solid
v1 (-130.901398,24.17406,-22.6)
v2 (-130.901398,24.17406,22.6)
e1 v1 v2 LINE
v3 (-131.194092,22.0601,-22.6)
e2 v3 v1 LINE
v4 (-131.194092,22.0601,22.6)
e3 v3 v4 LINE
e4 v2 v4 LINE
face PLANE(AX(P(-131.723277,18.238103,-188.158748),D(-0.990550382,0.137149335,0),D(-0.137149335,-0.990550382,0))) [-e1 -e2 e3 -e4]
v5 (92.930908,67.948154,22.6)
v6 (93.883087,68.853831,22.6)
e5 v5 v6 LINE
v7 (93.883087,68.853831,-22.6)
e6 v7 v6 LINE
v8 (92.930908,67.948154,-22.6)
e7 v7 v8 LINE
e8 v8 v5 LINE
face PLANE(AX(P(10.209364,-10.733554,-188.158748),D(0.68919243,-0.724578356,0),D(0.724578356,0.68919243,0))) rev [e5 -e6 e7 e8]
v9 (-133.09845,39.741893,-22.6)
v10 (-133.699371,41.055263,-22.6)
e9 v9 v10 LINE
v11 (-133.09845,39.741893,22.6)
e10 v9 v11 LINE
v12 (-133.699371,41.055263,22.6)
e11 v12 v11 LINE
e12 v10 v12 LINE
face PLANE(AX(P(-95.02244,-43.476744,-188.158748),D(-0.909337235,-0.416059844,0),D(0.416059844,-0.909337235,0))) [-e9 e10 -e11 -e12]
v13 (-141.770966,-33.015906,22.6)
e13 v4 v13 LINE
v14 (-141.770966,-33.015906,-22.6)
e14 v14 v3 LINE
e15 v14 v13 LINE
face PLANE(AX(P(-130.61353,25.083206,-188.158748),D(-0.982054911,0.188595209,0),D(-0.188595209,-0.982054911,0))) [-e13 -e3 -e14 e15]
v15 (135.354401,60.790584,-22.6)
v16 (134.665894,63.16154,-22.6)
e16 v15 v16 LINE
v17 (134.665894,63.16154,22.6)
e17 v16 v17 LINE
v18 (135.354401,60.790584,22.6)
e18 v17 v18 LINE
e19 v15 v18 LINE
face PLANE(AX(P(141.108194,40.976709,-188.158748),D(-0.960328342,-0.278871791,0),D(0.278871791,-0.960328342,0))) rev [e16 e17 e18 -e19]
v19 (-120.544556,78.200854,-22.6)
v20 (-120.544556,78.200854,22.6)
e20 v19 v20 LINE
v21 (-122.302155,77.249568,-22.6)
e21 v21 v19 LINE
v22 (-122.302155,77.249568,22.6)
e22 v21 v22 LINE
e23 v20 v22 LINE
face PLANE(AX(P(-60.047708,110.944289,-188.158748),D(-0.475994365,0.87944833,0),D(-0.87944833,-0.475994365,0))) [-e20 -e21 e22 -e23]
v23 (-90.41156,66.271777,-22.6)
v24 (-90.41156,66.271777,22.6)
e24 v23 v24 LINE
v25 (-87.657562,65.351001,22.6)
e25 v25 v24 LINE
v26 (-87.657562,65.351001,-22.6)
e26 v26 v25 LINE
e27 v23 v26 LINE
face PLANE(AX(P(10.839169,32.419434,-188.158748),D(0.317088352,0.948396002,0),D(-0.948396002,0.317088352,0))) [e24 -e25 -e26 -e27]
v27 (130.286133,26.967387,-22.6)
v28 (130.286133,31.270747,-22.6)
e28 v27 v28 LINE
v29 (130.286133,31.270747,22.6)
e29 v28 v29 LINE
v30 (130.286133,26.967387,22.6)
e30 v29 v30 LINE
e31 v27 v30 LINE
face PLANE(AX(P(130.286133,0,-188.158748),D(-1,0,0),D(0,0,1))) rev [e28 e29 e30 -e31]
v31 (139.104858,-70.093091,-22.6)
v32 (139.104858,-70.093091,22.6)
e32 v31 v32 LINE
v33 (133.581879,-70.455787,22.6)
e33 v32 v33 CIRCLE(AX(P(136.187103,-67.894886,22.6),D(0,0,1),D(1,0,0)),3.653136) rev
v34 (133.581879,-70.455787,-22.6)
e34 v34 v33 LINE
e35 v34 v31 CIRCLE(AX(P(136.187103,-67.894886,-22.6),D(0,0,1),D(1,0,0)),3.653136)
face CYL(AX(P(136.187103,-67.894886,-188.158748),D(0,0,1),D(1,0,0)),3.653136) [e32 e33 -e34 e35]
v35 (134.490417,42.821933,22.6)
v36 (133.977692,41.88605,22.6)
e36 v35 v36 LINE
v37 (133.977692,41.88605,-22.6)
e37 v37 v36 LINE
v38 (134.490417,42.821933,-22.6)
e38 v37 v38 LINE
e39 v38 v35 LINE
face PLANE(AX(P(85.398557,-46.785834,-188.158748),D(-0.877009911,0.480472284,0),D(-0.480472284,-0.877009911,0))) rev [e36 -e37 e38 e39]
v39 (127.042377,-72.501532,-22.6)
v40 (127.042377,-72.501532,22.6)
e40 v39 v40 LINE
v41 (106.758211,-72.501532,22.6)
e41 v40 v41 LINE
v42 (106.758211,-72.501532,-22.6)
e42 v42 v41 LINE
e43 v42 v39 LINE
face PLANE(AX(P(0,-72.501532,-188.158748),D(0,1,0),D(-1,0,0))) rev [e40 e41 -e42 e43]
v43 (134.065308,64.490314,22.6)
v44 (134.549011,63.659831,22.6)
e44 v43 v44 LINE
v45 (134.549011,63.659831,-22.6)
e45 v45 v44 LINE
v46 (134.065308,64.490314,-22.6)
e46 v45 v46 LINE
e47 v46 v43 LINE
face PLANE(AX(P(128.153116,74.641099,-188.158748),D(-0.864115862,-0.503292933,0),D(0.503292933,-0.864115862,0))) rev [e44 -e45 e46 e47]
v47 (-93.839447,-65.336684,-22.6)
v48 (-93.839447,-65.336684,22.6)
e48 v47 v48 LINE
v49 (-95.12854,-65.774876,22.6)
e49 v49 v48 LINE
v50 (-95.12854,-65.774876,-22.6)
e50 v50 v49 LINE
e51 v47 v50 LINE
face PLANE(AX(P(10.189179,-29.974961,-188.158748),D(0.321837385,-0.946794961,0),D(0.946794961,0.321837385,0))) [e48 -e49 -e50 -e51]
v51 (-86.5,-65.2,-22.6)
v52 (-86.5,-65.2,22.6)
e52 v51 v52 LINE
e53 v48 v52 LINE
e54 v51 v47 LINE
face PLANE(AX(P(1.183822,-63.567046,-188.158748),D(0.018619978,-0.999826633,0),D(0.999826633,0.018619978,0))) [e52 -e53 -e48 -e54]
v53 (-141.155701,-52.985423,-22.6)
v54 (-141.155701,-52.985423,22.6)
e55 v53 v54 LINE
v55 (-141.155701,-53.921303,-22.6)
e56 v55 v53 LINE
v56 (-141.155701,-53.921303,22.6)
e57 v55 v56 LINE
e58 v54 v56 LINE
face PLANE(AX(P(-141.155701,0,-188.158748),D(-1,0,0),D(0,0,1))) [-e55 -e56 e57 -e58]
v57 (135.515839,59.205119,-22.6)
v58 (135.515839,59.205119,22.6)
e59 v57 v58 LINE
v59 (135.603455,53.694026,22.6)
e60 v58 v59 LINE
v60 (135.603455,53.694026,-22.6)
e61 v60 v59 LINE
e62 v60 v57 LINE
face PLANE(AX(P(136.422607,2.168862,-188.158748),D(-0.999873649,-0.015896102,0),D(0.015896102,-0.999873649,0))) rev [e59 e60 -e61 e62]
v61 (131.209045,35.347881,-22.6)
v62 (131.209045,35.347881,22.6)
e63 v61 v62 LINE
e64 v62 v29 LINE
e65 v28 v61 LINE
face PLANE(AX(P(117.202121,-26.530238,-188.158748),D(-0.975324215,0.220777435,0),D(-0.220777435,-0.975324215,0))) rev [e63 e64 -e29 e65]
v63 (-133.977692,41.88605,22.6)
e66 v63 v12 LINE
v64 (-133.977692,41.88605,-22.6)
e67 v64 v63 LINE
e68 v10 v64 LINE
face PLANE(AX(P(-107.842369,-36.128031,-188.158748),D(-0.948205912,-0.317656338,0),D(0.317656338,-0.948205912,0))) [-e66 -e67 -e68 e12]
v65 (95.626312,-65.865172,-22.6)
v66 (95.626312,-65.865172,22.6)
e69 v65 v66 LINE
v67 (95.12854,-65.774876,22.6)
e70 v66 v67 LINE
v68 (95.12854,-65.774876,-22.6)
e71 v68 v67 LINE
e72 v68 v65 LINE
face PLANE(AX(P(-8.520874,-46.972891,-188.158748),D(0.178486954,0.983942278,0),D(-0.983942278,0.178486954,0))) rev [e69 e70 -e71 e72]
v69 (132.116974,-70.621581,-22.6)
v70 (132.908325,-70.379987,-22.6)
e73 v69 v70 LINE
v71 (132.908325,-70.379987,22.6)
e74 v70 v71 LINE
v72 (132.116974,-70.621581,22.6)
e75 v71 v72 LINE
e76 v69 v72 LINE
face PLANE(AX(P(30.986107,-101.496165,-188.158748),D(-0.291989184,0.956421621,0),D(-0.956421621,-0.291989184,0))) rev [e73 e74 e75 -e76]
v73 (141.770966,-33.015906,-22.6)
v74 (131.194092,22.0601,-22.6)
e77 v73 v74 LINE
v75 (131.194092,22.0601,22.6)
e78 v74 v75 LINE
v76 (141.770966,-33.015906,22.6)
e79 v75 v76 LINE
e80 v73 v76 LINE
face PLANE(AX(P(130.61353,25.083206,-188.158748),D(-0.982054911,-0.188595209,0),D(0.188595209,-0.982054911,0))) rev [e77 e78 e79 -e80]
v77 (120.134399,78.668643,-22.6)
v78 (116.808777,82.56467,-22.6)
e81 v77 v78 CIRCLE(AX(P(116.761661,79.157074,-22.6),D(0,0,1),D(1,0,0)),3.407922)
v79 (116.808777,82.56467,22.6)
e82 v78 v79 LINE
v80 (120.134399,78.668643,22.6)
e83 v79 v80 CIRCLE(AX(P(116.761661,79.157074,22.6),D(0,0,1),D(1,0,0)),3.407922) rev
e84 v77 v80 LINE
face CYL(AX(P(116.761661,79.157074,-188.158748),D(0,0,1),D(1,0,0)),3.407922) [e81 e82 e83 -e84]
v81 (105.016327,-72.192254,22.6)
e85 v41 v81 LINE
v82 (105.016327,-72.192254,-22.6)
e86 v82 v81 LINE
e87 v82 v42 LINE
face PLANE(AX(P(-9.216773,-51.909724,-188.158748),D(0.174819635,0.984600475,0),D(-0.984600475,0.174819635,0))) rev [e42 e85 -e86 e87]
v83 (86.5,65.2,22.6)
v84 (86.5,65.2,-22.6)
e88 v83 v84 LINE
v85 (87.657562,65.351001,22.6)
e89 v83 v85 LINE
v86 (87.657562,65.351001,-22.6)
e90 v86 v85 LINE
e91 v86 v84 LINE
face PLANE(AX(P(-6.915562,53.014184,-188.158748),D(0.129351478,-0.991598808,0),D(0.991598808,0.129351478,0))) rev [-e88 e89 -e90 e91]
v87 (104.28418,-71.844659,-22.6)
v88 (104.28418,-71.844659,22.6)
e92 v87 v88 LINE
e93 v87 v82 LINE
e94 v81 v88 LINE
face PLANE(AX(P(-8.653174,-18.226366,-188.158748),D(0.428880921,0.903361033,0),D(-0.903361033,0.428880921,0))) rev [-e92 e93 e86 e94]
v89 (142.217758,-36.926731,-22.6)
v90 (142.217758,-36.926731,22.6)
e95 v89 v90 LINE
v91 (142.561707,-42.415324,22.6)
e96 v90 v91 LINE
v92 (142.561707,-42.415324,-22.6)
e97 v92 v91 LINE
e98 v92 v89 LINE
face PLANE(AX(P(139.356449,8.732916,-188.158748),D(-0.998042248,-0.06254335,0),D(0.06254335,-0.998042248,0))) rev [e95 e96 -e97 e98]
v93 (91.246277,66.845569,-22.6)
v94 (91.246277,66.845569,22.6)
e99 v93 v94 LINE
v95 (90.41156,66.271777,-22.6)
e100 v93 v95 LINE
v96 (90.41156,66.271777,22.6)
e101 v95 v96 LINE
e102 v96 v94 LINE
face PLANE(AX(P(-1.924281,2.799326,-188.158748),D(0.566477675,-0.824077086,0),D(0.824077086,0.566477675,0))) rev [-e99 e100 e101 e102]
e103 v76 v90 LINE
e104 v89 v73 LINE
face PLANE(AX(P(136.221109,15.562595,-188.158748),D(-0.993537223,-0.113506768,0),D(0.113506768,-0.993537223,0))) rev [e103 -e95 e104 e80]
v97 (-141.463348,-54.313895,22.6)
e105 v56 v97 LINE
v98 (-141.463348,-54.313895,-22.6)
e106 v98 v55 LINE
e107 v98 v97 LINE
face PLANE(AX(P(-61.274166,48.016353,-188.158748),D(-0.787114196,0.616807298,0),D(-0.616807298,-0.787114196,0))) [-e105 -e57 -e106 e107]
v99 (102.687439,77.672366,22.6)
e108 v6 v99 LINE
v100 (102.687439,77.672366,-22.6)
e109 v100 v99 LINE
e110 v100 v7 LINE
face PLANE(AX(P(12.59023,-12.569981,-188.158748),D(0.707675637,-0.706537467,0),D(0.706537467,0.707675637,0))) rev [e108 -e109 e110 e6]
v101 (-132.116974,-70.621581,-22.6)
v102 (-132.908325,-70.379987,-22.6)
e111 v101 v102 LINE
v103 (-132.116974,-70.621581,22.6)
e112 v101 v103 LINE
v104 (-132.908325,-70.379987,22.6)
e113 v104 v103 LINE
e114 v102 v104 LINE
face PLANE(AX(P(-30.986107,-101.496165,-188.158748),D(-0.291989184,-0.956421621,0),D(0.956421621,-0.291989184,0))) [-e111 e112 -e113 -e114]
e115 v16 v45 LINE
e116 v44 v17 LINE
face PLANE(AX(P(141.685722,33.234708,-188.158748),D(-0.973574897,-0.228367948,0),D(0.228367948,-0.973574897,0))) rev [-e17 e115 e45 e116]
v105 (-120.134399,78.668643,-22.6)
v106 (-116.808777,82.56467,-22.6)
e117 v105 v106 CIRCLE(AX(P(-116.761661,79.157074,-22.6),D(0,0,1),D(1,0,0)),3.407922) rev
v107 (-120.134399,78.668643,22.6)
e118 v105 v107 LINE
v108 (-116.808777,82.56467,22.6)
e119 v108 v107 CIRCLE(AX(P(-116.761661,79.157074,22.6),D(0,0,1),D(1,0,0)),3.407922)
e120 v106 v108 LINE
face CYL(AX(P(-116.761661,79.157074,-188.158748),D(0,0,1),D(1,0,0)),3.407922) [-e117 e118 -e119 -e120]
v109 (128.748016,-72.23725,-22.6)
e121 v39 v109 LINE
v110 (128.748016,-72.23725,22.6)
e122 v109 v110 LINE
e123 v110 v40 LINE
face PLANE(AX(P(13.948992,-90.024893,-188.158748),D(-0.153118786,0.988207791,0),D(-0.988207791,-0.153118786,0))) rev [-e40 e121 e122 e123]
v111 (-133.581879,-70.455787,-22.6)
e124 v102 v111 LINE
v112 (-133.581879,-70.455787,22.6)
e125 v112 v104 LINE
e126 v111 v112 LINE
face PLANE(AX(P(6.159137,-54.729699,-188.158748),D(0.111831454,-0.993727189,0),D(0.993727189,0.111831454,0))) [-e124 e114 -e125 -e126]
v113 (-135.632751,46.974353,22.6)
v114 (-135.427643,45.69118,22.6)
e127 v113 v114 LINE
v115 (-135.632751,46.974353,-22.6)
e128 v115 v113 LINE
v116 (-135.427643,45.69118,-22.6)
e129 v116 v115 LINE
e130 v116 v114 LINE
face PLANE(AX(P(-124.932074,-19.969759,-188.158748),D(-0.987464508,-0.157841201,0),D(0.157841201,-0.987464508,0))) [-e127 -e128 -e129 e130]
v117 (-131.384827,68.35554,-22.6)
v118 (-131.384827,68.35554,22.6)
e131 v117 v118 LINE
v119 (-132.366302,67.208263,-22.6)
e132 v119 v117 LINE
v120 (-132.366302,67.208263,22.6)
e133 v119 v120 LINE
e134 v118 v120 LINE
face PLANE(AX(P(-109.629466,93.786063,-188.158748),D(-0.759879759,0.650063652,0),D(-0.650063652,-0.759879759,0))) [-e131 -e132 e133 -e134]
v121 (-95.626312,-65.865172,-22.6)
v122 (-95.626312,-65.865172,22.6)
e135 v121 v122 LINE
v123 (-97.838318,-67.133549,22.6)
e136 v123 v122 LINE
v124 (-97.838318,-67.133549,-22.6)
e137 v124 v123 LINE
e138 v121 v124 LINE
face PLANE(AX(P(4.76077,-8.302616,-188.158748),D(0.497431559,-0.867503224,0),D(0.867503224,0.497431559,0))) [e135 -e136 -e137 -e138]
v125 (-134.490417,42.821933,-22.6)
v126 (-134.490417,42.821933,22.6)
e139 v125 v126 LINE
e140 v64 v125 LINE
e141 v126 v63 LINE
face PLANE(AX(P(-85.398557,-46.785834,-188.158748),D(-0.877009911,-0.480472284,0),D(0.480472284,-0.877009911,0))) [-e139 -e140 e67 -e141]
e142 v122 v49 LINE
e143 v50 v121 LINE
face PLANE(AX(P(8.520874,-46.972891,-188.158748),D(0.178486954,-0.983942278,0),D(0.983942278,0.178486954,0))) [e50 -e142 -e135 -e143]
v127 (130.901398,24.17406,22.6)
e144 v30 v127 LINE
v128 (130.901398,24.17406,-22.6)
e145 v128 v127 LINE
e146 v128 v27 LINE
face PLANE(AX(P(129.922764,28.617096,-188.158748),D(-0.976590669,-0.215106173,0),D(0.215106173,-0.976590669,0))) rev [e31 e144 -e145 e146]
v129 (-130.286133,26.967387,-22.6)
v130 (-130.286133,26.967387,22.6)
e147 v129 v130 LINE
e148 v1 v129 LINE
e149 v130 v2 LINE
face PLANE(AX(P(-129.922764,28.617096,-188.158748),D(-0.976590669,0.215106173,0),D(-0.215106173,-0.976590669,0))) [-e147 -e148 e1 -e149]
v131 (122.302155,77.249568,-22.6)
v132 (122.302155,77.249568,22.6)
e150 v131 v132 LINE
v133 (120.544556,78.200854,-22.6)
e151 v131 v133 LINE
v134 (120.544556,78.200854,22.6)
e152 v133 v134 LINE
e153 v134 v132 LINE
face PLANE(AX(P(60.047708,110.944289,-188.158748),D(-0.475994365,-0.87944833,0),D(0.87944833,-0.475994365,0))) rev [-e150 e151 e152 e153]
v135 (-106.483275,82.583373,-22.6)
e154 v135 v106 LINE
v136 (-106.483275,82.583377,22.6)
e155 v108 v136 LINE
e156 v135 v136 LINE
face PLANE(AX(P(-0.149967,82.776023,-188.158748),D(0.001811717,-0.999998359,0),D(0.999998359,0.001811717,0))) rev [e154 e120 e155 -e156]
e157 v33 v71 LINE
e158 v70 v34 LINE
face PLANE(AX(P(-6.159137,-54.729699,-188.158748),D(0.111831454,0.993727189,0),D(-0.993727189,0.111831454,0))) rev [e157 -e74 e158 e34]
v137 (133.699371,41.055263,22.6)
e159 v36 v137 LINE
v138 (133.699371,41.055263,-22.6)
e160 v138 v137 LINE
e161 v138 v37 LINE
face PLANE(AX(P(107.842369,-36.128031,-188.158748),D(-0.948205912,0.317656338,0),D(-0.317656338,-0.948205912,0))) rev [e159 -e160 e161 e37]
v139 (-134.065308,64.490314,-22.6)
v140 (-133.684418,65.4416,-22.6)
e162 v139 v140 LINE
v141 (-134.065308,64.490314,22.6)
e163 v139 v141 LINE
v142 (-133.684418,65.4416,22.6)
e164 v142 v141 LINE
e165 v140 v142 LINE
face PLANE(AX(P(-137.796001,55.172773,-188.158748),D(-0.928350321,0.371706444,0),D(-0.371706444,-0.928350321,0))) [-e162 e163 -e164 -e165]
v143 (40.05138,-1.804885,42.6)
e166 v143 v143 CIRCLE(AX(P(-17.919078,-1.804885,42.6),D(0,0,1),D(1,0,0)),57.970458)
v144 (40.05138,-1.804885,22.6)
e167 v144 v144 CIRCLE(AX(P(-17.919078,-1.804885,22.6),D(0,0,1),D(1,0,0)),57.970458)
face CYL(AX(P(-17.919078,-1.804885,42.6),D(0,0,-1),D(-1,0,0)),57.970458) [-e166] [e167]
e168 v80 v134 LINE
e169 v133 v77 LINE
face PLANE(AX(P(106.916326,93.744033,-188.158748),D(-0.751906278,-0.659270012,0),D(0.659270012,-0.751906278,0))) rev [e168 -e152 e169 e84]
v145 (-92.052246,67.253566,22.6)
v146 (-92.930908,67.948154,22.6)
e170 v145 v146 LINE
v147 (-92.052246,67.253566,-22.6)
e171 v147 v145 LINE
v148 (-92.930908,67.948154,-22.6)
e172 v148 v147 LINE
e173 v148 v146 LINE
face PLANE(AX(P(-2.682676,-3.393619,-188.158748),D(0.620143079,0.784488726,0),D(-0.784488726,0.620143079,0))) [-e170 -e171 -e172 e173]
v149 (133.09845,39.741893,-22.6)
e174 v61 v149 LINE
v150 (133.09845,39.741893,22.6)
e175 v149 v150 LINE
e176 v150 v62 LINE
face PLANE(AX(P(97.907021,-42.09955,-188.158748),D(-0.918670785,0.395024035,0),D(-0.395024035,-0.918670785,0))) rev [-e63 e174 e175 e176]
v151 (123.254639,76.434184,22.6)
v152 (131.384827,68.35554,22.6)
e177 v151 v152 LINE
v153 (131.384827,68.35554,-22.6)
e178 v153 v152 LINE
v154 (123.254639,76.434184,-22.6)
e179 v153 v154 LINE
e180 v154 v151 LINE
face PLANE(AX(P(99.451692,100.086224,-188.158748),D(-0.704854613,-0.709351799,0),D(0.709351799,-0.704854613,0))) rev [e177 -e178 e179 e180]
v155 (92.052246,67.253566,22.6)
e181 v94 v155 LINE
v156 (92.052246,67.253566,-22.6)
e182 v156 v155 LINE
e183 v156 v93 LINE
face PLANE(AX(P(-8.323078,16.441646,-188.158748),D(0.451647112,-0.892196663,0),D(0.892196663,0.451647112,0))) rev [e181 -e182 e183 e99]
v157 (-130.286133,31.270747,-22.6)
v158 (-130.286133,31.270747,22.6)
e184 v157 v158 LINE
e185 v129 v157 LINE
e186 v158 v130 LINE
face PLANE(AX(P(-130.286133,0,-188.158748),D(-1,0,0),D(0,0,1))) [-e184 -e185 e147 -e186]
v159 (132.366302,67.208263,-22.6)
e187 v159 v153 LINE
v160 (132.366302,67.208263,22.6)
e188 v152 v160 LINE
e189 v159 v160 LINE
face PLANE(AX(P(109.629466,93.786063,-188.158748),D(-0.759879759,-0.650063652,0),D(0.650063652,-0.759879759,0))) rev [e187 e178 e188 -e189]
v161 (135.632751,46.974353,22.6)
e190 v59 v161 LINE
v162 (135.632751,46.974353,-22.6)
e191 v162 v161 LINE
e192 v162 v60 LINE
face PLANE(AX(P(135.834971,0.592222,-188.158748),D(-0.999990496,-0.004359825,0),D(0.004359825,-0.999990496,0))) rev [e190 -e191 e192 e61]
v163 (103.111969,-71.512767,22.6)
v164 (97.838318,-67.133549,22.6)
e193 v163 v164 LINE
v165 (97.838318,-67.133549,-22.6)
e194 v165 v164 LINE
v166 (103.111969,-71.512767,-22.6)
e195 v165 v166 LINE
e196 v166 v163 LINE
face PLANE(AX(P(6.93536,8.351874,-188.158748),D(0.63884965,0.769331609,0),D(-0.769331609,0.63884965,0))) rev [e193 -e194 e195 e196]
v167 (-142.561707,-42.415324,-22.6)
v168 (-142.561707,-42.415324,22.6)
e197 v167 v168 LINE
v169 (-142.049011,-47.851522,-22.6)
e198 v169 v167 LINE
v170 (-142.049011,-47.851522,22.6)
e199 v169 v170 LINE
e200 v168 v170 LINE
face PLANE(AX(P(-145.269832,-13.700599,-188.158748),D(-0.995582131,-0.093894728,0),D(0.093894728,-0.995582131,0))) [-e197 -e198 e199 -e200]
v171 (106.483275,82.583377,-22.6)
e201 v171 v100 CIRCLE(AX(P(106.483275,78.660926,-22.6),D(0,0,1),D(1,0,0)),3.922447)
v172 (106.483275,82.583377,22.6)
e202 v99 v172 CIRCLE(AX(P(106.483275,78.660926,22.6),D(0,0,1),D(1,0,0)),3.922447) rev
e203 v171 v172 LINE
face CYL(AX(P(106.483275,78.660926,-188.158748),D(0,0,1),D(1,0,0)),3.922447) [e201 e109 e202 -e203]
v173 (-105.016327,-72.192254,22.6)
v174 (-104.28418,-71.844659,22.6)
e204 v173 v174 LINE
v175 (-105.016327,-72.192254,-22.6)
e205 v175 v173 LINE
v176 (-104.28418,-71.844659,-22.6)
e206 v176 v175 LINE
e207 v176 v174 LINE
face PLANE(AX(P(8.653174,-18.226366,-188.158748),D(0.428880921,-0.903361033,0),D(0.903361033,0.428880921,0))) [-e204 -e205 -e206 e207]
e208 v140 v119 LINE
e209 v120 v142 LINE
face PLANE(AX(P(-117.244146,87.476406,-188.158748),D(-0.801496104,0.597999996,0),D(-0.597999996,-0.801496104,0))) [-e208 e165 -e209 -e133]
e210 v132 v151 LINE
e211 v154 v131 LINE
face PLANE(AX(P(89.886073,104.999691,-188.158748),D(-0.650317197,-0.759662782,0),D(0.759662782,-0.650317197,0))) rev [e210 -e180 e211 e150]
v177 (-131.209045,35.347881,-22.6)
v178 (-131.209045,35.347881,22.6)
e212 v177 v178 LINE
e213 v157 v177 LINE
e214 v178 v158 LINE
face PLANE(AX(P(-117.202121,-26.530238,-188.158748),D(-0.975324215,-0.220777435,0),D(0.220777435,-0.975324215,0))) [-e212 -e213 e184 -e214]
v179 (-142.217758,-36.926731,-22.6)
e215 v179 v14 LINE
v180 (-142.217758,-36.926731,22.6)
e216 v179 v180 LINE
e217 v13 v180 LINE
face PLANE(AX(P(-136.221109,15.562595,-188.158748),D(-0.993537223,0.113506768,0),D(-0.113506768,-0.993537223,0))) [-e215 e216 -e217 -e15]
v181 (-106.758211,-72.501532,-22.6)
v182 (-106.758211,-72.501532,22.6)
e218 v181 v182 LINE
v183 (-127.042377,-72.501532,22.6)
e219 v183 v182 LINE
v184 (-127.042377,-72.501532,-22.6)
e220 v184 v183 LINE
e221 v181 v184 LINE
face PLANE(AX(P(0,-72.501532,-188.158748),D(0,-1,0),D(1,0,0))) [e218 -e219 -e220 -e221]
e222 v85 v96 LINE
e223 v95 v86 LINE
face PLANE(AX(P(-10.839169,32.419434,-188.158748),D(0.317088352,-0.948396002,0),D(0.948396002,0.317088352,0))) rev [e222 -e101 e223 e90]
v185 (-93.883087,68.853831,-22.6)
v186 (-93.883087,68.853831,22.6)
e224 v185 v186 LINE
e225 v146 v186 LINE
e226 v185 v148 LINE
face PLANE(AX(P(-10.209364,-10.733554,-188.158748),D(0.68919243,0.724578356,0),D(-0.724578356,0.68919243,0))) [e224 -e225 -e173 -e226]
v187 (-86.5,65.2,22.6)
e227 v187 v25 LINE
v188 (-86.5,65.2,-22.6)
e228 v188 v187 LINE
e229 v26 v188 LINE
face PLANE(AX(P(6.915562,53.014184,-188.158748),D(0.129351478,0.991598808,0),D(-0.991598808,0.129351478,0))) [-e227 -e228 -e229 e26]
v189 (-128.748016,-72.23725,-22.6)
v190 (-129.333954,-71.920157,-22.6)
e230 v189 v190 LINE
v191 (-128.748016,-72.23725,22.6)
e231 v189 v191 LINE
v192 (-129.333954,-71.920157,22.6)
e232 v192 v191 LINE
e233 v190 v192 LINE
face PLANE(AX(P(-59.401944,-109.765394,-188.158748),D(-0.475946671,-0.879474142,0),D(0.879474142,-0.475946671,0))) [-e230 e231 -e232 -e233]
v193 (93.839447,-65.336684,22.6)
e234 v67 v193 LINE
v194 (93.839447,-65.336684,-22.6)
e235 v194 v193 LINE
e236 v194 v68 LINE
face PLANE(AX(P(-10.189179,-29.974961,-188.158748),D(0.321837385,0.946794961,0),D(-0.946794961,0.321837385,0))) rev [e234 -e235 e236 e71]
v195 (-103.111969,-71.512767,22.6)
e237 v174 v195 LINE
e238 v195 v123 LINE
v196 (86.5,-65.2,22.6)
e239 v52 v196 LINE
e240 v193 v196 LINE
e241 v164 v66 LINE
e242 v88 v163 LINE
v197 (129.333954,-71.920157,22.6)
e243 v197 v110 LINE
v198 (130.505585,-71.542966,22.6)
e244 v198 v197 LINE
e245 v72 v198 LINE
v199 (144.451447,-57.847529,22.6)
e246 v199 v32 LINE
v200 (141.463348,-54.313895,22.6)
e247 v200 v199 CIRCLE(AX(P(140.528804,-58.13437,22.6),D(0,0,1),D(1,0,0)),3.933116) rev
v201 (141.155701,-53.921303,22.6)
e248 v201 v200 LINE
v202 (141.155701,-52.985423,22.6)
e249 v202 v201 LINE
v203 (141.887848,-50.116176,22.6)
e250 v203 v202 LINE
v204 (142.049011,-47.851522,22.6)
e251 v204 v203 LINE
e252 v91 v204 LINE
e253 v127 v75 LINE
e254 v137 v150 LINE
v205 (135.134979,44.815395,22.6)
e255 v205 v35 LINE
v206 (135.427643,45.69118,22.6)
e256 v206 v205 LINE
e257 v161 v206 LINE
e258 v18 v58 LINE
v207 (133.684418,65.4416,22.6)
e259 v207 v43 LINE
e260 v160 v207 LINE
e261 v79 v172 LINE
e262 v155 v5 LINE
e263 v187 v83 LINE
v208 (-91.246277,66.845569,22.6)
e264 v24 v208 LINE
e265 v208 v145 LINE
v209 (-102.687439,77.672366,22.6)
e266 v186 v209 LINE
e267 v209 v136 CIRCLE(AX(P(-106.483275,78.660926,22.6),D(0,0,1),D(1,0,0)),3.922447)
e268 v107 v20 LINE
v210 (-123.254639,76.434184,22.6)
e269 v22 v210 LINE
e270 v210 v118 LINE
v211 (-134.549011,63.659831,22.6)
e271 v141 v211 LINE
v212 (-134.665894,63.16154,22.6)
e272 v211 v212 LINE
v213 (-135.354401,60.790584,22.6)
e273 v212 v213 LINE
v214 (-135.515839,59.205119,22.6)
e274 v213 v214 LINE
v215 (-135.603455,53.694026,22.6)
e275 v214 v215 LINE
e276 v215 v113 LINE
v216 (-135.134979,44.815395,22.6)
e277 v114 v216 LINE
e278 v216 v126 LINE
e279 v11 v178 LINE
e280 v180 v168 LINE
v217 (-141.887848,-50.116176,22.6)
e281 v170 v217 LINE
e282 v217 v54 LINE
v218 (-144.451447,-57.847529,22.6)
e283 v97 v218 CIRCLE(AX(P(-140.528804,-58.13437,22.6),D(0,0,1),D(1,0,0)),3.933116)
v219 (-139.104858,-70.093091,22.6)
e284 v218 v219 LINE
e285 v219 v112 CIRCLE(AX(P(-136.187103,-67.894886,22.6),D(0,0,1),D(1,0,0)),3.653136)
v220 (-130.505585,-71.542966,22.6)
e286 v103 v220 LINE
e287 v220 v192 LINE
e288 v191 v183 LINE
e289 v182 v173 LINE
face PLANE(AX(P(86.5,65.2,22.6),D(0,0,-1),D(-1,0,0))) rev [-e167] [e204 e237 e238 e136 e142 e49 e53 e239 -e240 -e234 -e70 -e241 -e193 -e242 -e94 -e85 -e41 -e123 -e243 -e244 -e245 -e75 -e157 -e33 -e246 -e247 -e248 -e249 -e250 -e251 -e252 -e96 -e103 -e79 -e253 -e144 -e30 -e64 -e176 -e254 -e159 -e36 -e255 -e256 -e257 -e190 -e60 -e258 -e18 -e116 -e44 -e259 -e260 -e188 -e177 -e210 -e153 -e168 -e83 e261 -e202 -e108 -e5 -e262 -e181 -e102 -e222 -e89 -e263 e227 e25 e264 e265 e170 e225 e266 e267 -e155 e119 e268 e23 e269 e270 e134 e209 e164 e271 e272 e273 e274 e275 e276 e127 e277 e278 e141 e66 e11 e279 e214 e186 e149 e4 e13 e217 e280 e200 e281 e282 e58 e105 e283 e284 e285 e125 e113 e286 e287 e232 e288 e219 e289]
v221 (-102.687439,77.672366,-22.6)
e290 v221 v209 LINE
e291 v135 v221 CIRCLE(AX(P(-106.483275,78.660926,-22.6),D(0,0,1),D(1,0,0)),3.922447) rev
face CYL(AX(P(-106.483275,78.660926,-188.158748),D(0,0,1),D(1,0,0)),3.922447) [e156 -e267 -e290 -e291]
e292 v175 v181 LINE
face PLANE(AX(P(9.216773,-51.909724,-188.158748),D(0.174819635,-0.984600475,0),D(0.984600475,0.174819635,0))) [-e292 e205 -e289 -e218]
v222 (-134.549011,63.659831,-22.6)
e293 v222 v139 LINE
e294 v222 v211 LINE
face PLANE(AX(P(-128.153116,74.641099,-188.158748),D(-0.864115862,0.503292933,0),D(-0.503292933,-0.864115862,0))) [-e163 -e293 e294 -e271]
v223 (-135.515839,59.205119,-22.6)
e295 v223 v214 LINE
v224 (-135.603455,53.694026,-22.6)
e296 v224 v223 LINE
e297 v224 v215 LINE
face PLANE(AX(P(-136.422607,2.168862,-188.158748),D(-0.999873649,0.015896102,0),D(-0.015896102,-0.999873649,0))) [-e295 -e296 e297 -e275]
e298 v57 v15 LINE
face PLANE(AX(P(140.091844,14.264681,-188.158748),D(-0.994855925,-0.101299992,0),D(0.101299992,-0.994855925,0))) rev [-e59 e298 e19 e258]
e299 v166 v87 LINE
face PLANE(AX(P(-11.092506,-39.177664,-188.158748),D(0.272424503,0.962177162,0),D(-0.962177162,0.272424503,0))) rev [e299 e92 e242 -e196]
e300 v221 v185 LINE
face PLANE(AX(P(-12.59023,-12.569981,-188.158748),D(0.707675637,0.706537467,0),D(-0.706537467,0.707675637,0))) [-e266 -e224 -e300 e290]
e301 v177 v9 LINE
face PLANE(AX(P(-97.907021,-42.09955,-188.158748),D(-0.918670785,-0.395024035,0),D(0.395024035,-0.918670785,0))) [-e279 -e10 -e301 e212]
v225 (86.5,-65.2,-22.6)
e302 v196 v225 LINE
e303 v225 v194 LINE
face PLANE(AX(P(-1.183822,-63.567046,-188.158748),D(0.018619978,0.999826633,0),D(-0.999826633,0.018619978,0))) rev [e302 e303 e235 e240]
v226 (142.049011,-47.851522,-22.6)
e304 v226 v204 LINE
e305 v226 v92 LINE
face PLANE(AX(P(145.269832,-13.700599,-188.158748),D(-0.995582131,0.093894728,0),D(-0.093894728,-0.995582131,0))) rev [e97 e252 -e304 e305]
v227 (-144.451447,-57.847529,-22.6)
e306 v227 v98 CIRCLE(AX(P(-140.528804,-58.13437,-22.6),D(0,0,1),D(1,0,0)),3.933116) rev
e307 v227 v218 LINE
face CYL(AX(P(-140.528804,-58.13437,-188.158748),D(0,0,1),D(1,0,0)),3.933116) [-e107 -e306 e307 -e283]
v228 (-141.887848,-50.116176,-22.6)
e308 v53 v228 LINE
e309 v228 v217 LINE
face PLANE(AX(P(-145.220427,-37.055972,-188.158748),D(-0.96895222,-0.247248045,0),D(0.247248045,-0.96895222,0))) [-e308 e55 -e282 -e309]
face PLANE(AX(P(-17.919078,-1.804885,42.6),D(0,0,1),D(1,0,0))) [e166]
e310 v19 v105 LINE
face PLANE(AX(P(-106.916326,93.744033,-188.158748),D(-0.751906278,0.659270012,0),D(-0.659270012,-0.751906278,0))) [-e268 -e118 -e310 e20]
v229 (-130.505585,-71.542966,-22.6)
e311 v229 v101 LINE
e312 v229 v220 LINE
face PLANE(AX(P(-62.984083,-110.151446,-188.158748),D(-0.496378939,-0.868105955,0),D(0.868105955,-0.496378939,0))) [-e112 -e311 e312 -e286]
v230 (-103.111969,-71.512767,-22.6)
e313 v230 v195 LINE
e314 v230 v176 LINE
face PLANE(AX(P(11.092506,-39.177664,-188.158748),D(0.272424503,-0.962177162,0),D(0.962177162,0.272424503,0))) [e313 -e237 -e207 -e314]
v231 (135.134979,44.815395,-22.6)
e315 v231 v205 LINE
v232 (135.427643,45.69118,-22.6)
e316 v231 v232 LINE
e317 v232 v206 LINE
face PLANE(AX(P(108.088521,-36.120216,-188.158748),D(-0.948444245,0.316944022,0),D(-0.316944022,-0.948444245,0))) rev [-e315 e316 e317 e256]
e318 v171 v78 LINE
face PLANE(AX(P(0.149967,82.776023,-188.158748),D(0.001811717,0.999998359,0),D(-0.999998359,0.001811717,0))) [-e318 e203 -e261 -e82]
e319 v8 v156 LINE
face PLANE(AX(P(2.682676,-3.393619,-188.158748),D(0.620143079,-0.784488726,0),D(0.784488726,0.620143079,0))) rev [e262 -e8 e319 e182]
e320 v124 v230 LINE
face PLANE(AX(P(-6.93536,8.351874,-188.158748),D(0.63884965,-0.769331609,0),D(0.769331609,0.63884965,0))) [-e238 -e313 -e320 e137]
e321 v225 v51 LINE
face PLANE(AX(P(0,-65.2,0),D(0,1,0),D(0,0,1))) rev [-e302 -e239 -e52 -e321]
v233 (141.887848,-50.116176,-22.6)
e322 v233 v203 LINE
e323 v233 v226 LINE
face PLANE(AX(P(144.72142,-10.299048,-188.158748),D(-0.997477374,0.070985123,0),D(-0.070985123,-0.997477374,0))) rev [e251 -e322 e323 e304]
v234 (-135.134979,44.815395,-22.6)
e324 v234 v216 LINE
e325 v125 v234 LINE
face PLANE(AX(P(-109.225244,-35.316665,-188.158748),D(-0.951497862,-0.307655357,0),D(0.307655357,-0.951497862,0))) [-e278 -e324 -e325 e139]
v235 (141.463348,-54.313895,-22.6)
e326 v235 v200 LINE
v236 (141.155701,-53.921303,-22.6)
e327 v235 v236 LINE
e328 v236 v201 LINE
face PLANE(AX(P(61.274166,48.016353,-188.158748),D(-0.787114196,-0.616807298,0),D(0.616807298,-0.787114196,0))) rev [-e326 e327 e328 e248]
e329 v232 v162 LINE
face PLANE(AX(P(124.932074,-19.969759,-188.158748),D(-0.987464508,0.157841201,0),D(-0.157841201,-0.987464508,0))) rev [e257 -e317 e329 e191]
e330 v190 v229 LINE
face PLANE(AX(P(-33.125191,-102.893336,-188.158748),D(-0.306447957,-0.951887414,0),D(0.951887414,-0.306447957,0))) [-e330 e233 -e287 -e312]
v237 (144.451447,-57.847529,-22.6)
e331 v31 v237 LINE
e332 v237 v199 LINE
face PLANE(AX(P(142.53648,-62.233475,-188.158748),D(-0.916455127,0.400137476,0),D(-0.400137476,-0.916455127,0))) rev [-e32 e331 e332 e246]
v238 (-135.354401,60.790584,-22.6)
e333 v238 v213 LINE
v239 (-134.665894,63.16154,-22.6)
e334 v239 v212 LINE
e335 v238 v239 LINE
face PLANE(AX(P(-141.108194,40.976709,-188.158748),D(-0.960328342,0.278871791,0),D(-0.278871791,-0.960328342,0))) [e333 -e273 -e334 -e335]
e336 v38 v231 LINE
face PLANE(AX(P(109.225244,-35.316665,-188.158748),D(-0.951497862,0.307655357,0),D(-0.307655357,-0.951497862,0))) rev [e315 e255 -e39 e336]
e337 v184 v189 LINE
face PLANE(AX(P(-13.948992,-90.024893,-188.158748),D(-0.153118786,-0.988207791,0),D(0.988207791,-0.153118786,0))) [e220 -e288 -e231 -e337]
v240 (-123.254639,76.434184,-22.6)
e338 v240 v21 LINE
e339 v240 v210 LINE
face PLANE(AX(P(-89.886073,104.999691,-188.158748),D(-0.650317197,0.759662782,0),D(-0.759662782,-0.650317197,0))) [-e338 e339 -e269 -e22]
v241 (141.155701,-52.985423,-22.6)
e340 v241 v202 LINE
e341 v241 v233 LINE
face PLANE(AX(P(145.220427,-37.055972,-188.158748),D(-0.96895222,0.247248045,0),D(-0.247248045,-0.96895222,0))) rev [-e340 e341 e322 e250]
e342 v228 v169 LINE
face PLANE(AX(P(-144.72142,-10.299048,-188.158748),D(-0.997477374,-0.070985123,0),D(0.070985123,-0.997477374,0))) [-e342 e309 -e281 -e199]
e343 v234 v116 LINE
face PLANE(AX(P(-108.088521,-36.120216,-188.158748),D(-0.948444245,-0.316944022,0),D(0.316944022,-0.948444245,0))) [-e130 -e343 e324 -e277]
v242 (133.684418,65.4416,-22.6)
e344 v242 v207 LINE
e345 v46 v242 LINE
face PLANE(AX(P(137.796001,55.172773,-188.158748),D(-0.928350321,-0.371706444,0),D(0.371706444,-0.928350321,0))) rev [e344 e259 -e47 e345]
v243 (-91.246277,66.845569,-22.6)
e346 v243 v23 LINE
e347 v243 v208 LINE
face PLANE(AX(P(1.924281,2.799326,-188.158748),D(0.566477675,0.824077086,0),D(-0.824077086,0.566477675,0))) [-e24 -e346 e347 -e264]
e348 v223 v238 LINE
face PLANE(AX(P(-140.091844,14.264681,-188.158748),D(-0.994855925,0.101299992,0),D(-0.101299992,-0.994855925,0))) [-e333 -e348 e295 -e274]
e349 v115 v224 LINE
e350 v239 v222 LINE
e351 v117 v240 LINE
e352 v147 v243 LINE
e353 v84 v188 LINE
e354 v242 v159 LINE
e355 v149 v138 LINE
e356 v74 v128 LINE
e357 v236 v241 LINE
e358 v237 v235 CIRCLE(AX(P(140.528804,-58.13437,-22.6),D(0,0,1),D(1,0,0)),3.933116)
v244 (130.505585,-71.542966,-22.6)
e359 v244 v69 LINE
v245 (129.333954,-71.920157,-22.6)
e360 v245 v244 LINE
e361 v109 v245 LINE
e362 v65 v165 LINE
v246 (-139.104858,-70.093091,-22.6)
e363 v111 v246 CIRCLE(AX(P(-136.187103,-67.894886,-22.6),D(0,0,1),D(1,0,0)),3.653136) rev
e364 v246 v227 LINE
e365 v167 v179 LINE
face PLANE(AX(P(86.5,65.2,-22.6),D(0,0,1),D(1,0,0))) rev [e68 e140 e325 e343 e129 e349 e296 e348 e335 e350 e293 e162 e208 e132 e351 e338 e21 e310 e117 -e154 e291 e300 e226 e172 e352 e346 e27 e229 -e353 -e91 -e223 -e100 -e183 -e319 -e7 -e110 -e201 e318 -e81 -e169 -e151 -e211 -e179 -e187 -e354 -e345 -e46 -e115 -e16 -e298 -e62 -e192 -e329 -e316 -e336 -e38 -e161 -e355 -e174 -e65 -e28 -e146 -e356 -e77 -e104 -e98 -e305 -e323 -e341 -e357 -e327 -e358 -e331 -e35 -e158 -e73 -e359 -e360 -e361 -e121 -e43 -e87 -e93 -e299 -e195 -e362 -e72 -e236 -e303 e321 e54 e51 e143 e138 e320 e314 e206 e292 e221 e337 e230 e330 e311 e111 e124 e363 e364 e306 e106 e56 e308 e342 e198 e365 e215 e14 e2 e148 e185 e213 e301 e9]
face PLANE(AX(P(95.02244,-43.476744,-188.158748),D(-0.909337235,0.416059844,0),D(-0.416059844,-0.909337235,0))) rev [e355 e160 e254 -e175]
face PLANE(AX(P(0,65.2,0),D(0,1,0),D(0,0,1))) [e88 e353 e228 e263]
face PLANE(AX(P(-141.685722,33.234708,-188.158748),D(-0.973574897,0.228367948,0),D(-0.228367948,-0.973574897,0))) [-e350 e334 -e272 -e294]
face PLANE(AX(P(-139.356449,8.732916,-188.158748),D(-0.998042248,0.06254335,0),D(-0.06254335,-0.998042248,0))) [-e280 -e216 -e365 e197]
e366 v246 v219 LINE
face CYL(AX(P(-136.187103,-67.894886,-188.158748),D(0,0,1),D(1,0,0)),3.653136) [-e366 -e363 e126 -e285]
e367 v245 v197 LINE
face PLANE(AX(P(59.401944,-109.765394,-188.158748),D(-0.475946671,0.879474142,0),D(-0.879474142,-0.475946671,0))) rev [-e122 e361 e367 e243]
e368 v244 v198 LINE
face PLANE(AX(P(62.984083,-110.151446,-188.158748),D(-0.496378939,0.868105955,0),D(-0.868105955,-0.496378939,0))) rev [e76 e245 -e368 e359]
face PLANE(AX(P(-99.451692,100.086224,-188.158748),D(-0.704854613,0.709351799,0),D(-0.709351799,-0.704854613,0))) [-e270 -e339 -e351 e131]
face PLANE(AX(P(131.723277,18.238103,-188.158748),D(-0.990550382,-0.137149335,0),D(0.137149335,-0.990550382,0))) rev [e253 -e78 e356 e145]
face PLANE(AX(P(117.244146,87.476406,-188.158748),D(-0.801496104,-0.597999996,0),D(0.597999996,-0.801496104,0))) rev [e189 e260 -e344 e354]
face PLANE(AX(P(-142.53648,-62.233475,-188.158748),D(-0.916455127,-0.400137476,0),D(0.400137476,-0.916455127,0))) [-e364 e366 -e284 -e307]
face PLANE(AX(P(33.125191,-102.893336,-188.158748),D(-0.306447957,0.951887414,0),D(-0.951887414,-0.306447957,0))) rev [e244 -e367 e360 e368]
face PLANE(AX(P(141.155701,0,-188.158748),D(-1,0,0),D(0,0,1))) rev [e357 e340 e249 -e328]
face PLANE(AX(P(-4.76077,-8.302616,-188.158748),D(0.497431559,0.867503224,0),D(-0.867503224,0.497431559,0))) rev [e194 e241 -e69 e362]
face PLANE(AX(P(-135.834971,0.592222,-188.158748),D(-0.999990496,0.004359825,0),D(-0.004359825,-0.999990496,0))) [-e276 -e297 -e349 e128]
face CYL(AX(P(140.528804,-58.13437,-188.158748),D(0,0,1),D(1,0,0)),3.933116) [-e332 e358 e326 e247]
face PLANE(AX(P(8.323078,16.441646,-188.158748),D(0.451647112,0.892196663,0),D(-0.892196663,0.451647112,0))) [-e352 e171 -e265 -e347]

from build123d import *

# Parameters (mm, degrees)
ESBO_O2_W                = 173
ESBO_O2_H                = 45.2
RESSALTO_EXTRUS_O2_DEPTH = 65.2
ESBO_O3_R                = 57.970457698
RESSALTO_EXTRUS_O3_DEPTH = 20
RESSALTO_EXTRUS_O4_START = -45.2
RESSALTO_EXTRUS_O4_DEPTH = 45.2


# Read off the part's stored shape, not the designer's step: Ressalto-extrusão4
with BuildPart() as part:
    # Esboço2 → Ressalto-extrusão2 (new, symmetric)
    with BuildSketch(Plane(origin=(0, 0, 0), x_dir=(1, 0, 0), z_dir=(0, 1, 0))):
        Rectangle(ESBO_O2_W, ESBO_O2_H)
    extrude(amount=RESSALTO_EXTRUS_O2_DEPTH, both=True)

    # Esboço3 → Ressalto-extrusão3 (add)
    with BuildSketch(Plane.XY.offset(22.6)):
        with Locations((-17.919078136, -1.804884681)):
            Circle(ESBO_O3_R)
    extrude(amount=RESSALTO_EXTRUS_O3_DEPTH)

    # Ressalto-extrusão4 outline → Ressalto-extrusão4 (add)
    with BuildSketch(Plane.XY.offset(22.6).offset(RESSALTO_EXTRUS_O4_START)):
        with BuildLine():
            Line((102.68744208, 77.672367144), (93.883087158, 68.853831482))
            Line((93.883087158, 68.853831482), (92.930908203, 67.948153687))
            Line((92.930908203, 67.948153687), (92.052246094, 67.253565979))
            Line((92.052246094, 67.253565979), (91.246276855, 66.845568848))
            Line((91.246276855, 66.845568848), (90.411560059, 66.271777344))
            Line((90.411560059, 66.271777344), (87.657562256, 65.351000977))
            Line((87.657562256, 65.351000977), (86.5, 65.2))
            Line((86.5, 65.2), (86.5, -65.2))
            Line((86.5, -65.2), (93.839447021, -65.336684036))
            Line((93.839447021, -65.336684036), (95.128540039, -65.774876404))
            Line((95.128540039, -65.774876404), (95.626312256, -65.865172195))
            Line((95.626312256, -65.865172195), (97.838317871, -67.1335495))
            Line((97.838317871, -67.1335495), (103.111968994, -71.512766647))
            Line((103.111968994, -71.512766647), (104.284179687, -71.844658661))
            Line((104.284179687, -71.844658661), (105.016326904, -72.192253876))
            Line((105.016326904, -72.192253876), (106.758210561, -72.501532079))
            Line((106.758210561, -72.501532079), (127.042376704, -72.501532079))
            Line((127.042376704, -72.501532079), (128.748016357, -72.237250137))
            Line((128.748016357, -72.237250137), (129.333953857, -71.920157242))
            Line((129.333953857, -71.920157242), (130.505584717, -71.542965698))
            Line((130.505584717, -71.542965698), (132.116973877, -70.621580887))
            Line((132.116973877, -70.621580887), (132.908325195, -70.379986572))
            Line((132.908325195, -70.379986572), (133.581878662, -70.455786514))
            ThreePointArc((133.581878662, -70.455786514), (136.426489502, -71.540170383), (139.104858398, -70.09309082))
            Line((139.104858398, -70.09309082), (144.451446533, -57.847529221))
            ThreePointArc((144.451446533, -57.847529221), (143.532086949, -55.594745414), (141.463348389, -54.313895035))
            Line((141.463348389, -54.313895035), (141.155700684, -53.921302605))
            Line((141.155700684, -53.921302605), (141.155700684, -52.985422897))
            Line((141.155700684, -52.985422897), (141.8878479, -50.116176057))
            Line((141.8878479, -50.116176057), (142.04901123, -47.851521599))
            Line((142.04901123, -47.851521599), (142.561706543, -42.41532402))
            Line((142.561706543, -42.41532402), (142.217758179, -36.926730919))
            Line((142.217758179, -36.926730919), (141.770965576, -33.015906143))
            Line((141.770965576, -33.015906143), (131.194091797, 22.060099792))
            Line((131.194091797, 22.060099792), (130.901397705, 24.174060059))
            Line((130.901397705, 24.174060059), (130.286132812, 26.96738739))
            Line((130.286132812, 26.96738739), (130.286132812, 31.270747375))
            Line((130.286132812, 31.270747375), (131.20904541, 35.347880554))
            Line((131.20904541, 35.347880554), (133.098449707, 39.741893005))
            Line((133.098449707, 39.741893005), (133.699371338, 41.055262756))
            Line((133.699371338, 41.055262756), (133.97769165, 41.886050415))
            Line((133.97769165, 41.886050415), (134.49041748, 42.821932983))
            Line((134.49041748, 42.821932983), (135.134979248, 44.815394592))
            Line((135.134979248, 44.815394592), (135.427642822, 45.69118042))
            Line((135.427642822, 45.69118042), (135.632751465, 46.974353027))
            Line((135.632751465, 46.974353027), (135.60345459, 53.694026184))
            Line((135.60345459, 53.694026184), (135.515838623, 59.205119324))
            Line((135.515838623, 59.205119324), (135.354400635, 60.790583801))
            Line((135.354400635, 60.790583801), (134.665893555, 63.161540222))
            Line((134.665893555, 63.161540222), (134.54901123, 63.659831238))
            Line((134.54901123, 63.659831238), (134.065307617, 64.490313721))
            Line((134.065307617, 64.490313721), (133.684417725, 65.441600037))
            Line((133.684417725, 65.441600037), (132.36630249, 67.208262634))
            Line((132.36630249, 67.208262634), (131.38482666, 68.355540466))
            Line((131.38482666, 68.355540466), (123.254638672, 76.434184265))
            Line((123.254638672, 76.434184265), (122.302154541, 77.249568176))
            Line((122.302154541, 77.249568176), (120.544555664, 78.200854492))
            Line((120.544555664, 78.200854492), (120.134399414, 78.668643188))
            ThreePointArc((120.134399414, 78.668643188), (119.353688391, 81.369611441), (116.808776855, 82.5646698))
            Line((116.808776855, 82.5646698), (106.483274703, 82.583373499))
            ThreePointArc((106.483274703, 82.583373499), (103.379795658, 81.059678188), (102.68744208, 77.672367144))
        make_face()
        with BuildLine():
            Line((-128.748016357, -72.237250137), (-127.042376704, -72.501532079))
            Line((-127.042376704, -72.501532079), (-106.758210561, -72.501532079))
            Line((-106.758210561, -72.501532079), (-105.016326904, -72.192253876))
            Line((-105.016326904, -72.192253876), (-104.284179688, -71.844658661))
            Line((-104.284179688, -71.844658661), (-103.111968994, -71.512766647))
            Line((-103.111968994, -71.512766647), (-97.838317871, -67.1335495))
            Line((-97.838317871, -67.1335495), (-95.626312256, -65.865172195))
            Line((-95.626312256, -65.865172195), (-95.128540039, -65.774876404))
            Line((-95.128540039, -65.774876404), (-93.839447021, -65.336684036))
            Line((-93.839447021, -65.336684036), (-86.5, -65.2))
            Line((-86.5, -65.2), (-86.5, 65.2))
            Line((-86.5, 65.2), (-87.657562256, 65.351000977))
            Line((-87.657562256, 65.351000977), (-90.411560059, 66.271777344))
            Line((-90.411560059, 66.271777344), (-91.246276855, 66.845568848))
            Line((-91.246276855, 66.845568848), (-92.052246094, 67.253565979))
            Line((-92.052246094, 67.253565979), (-92.930908203, 67.948153687))
            Line((-92.930908203, 67.948153687), (-93.883087158, 68.853831482))
            Line((-93.883087158, 68.853831482), (-102.68744208, 77.672367144))
            ThreePointArc((-102.68744208, 77.672367144), (-103.379795658, 81.059678188), (-106.483274703, 82.583373499))
            Line((-106.483274703, 82.583373499), (-116.808776855, 82.5646698))
            ThreePointArc((-116.808776855, 82.5646698), (-119.353688391, 81.369611441), (-120.134399414, 78.668643188))
            Line((-120.134399414, 78.668643188), (-120.544555664, 78.200854492))
            Line((-120.544555664, 78.200854492), (-122.302154541, 77.249568176))
            Line((-122.302154541, 77.249568176), (-123.254638672, 76.434184265))
            Line((-123.254638672, 76.434184265), (-131.38482666, 68.355540466))
            Line((-131.38482666, 68.355540466), (-132.36630249, 67.208262634))
            Line((-132.36630249, 67.208262634), (-133.684417725, 65.441600037))
            Line((-133.684417725, 65.441600037), (-134.065307617, 64.490313721))
            Line((-134.065307617, 64.490313721), (-134.54901123, 63.659831238))
            Line((-134.54901123, 63.659831238), (-134.665893555, 63.161540222))
            Line((-134.665893555, 63.161540222), (-135.354400635, 60.790583801))
            Line((-135.354400635, 60.790583801), (-135.515838623, 59.205119324))
            Line((-135.515838623, 59.205119324), (-135.60345459, 53.694026184))
            Line((-135.60345459, 53.694026184), (-135.632751465, 46.974353027))
            Line((-135.632751465, 46.974353027), (-135.427642822, 45.69118042))
            Line((-135.427642822, 45.69118042), (-135.134979248, 44.815394592))
            Line((-135.134979248, 44.815394592), (-134.49041748, 42.821932983))
            Line((-134.49041748, 42.821932983), (-133.97769165, 41.886050415))
            Line((-133.97769165, 41.886050415), (-133.699371338, 41.055262756))
            Line((-133.699371338, 41.055262756), (-133.098449707, 39.741893005))
            Line((-133.098449707, 39.741893005), (-131.20904541, 35.347880554))
            Line((-131.20904541, 35.347880554), (-130.286132813, 31.270747375))
            Line((-130.286132813, 31.270747375), (-130.286132812, 26.96738739))
            Line((-130.286132812, 26.96738739), (-130.901397705, 24.174060059))
            Line((-130.901397705, 24.174060059), (-131.194091797, 22.060099792))
            Line((-131.194091797, 22.060099792), (-141.770965576, -33.015906143))
            Line((-141.770965576, -33.015906143), (-142.217758179, -36.926730919))
            Line((-142.217758179, -36.926730919), (-142.561706543, -42.41532402))
            Line((-142.561706543, -42.41532402), (-142.04901123, -47.851521599))
            Line((-142.04901123, -47.851521599), (-141.8878479, -50.116176057))
            Line((-141.8878479, -50.116176057), (-141.155700684, -52.985422897))
            Line((-141.155700684, -52.985422897), (-141.155700684, -53.921302605))
            Line((-141.155700684, -53.921302605), (-141.463348389, -54.313895035))
            ThreePointArc((-141.463348389, -54.313895035), (-143.532086949, -55.594745414), (-144.451446533, -57.847529221))
            Line((-144.451446533, -57.847529221), (-139.104858398, -70.09309082))
            ThreePointArc((-139.104858398, -70.09309082), (-136.426489502, -71.540170383), (-133.581878662, -70.455786514))
            Line((-133.581878662, -70.455786514), (-132.908325195, -70.379986572))
            Line((-132.908325195, -70.379986572), (-132.116973877, -70.621580887))
            Line((-132.116973877, -70.621580887), (-130.505584717, -71.542965698))
            Line((-130.505584717, -71.542965698), (-129.333953857, -71.920157242))
            Line((-129.333953857, -71.920157242), (-128.748016357, -72.237250137))
        make_face()
    extrude(amount=RESSALTO_EXTRUS_O4_DEPTH)


solid = part.part
